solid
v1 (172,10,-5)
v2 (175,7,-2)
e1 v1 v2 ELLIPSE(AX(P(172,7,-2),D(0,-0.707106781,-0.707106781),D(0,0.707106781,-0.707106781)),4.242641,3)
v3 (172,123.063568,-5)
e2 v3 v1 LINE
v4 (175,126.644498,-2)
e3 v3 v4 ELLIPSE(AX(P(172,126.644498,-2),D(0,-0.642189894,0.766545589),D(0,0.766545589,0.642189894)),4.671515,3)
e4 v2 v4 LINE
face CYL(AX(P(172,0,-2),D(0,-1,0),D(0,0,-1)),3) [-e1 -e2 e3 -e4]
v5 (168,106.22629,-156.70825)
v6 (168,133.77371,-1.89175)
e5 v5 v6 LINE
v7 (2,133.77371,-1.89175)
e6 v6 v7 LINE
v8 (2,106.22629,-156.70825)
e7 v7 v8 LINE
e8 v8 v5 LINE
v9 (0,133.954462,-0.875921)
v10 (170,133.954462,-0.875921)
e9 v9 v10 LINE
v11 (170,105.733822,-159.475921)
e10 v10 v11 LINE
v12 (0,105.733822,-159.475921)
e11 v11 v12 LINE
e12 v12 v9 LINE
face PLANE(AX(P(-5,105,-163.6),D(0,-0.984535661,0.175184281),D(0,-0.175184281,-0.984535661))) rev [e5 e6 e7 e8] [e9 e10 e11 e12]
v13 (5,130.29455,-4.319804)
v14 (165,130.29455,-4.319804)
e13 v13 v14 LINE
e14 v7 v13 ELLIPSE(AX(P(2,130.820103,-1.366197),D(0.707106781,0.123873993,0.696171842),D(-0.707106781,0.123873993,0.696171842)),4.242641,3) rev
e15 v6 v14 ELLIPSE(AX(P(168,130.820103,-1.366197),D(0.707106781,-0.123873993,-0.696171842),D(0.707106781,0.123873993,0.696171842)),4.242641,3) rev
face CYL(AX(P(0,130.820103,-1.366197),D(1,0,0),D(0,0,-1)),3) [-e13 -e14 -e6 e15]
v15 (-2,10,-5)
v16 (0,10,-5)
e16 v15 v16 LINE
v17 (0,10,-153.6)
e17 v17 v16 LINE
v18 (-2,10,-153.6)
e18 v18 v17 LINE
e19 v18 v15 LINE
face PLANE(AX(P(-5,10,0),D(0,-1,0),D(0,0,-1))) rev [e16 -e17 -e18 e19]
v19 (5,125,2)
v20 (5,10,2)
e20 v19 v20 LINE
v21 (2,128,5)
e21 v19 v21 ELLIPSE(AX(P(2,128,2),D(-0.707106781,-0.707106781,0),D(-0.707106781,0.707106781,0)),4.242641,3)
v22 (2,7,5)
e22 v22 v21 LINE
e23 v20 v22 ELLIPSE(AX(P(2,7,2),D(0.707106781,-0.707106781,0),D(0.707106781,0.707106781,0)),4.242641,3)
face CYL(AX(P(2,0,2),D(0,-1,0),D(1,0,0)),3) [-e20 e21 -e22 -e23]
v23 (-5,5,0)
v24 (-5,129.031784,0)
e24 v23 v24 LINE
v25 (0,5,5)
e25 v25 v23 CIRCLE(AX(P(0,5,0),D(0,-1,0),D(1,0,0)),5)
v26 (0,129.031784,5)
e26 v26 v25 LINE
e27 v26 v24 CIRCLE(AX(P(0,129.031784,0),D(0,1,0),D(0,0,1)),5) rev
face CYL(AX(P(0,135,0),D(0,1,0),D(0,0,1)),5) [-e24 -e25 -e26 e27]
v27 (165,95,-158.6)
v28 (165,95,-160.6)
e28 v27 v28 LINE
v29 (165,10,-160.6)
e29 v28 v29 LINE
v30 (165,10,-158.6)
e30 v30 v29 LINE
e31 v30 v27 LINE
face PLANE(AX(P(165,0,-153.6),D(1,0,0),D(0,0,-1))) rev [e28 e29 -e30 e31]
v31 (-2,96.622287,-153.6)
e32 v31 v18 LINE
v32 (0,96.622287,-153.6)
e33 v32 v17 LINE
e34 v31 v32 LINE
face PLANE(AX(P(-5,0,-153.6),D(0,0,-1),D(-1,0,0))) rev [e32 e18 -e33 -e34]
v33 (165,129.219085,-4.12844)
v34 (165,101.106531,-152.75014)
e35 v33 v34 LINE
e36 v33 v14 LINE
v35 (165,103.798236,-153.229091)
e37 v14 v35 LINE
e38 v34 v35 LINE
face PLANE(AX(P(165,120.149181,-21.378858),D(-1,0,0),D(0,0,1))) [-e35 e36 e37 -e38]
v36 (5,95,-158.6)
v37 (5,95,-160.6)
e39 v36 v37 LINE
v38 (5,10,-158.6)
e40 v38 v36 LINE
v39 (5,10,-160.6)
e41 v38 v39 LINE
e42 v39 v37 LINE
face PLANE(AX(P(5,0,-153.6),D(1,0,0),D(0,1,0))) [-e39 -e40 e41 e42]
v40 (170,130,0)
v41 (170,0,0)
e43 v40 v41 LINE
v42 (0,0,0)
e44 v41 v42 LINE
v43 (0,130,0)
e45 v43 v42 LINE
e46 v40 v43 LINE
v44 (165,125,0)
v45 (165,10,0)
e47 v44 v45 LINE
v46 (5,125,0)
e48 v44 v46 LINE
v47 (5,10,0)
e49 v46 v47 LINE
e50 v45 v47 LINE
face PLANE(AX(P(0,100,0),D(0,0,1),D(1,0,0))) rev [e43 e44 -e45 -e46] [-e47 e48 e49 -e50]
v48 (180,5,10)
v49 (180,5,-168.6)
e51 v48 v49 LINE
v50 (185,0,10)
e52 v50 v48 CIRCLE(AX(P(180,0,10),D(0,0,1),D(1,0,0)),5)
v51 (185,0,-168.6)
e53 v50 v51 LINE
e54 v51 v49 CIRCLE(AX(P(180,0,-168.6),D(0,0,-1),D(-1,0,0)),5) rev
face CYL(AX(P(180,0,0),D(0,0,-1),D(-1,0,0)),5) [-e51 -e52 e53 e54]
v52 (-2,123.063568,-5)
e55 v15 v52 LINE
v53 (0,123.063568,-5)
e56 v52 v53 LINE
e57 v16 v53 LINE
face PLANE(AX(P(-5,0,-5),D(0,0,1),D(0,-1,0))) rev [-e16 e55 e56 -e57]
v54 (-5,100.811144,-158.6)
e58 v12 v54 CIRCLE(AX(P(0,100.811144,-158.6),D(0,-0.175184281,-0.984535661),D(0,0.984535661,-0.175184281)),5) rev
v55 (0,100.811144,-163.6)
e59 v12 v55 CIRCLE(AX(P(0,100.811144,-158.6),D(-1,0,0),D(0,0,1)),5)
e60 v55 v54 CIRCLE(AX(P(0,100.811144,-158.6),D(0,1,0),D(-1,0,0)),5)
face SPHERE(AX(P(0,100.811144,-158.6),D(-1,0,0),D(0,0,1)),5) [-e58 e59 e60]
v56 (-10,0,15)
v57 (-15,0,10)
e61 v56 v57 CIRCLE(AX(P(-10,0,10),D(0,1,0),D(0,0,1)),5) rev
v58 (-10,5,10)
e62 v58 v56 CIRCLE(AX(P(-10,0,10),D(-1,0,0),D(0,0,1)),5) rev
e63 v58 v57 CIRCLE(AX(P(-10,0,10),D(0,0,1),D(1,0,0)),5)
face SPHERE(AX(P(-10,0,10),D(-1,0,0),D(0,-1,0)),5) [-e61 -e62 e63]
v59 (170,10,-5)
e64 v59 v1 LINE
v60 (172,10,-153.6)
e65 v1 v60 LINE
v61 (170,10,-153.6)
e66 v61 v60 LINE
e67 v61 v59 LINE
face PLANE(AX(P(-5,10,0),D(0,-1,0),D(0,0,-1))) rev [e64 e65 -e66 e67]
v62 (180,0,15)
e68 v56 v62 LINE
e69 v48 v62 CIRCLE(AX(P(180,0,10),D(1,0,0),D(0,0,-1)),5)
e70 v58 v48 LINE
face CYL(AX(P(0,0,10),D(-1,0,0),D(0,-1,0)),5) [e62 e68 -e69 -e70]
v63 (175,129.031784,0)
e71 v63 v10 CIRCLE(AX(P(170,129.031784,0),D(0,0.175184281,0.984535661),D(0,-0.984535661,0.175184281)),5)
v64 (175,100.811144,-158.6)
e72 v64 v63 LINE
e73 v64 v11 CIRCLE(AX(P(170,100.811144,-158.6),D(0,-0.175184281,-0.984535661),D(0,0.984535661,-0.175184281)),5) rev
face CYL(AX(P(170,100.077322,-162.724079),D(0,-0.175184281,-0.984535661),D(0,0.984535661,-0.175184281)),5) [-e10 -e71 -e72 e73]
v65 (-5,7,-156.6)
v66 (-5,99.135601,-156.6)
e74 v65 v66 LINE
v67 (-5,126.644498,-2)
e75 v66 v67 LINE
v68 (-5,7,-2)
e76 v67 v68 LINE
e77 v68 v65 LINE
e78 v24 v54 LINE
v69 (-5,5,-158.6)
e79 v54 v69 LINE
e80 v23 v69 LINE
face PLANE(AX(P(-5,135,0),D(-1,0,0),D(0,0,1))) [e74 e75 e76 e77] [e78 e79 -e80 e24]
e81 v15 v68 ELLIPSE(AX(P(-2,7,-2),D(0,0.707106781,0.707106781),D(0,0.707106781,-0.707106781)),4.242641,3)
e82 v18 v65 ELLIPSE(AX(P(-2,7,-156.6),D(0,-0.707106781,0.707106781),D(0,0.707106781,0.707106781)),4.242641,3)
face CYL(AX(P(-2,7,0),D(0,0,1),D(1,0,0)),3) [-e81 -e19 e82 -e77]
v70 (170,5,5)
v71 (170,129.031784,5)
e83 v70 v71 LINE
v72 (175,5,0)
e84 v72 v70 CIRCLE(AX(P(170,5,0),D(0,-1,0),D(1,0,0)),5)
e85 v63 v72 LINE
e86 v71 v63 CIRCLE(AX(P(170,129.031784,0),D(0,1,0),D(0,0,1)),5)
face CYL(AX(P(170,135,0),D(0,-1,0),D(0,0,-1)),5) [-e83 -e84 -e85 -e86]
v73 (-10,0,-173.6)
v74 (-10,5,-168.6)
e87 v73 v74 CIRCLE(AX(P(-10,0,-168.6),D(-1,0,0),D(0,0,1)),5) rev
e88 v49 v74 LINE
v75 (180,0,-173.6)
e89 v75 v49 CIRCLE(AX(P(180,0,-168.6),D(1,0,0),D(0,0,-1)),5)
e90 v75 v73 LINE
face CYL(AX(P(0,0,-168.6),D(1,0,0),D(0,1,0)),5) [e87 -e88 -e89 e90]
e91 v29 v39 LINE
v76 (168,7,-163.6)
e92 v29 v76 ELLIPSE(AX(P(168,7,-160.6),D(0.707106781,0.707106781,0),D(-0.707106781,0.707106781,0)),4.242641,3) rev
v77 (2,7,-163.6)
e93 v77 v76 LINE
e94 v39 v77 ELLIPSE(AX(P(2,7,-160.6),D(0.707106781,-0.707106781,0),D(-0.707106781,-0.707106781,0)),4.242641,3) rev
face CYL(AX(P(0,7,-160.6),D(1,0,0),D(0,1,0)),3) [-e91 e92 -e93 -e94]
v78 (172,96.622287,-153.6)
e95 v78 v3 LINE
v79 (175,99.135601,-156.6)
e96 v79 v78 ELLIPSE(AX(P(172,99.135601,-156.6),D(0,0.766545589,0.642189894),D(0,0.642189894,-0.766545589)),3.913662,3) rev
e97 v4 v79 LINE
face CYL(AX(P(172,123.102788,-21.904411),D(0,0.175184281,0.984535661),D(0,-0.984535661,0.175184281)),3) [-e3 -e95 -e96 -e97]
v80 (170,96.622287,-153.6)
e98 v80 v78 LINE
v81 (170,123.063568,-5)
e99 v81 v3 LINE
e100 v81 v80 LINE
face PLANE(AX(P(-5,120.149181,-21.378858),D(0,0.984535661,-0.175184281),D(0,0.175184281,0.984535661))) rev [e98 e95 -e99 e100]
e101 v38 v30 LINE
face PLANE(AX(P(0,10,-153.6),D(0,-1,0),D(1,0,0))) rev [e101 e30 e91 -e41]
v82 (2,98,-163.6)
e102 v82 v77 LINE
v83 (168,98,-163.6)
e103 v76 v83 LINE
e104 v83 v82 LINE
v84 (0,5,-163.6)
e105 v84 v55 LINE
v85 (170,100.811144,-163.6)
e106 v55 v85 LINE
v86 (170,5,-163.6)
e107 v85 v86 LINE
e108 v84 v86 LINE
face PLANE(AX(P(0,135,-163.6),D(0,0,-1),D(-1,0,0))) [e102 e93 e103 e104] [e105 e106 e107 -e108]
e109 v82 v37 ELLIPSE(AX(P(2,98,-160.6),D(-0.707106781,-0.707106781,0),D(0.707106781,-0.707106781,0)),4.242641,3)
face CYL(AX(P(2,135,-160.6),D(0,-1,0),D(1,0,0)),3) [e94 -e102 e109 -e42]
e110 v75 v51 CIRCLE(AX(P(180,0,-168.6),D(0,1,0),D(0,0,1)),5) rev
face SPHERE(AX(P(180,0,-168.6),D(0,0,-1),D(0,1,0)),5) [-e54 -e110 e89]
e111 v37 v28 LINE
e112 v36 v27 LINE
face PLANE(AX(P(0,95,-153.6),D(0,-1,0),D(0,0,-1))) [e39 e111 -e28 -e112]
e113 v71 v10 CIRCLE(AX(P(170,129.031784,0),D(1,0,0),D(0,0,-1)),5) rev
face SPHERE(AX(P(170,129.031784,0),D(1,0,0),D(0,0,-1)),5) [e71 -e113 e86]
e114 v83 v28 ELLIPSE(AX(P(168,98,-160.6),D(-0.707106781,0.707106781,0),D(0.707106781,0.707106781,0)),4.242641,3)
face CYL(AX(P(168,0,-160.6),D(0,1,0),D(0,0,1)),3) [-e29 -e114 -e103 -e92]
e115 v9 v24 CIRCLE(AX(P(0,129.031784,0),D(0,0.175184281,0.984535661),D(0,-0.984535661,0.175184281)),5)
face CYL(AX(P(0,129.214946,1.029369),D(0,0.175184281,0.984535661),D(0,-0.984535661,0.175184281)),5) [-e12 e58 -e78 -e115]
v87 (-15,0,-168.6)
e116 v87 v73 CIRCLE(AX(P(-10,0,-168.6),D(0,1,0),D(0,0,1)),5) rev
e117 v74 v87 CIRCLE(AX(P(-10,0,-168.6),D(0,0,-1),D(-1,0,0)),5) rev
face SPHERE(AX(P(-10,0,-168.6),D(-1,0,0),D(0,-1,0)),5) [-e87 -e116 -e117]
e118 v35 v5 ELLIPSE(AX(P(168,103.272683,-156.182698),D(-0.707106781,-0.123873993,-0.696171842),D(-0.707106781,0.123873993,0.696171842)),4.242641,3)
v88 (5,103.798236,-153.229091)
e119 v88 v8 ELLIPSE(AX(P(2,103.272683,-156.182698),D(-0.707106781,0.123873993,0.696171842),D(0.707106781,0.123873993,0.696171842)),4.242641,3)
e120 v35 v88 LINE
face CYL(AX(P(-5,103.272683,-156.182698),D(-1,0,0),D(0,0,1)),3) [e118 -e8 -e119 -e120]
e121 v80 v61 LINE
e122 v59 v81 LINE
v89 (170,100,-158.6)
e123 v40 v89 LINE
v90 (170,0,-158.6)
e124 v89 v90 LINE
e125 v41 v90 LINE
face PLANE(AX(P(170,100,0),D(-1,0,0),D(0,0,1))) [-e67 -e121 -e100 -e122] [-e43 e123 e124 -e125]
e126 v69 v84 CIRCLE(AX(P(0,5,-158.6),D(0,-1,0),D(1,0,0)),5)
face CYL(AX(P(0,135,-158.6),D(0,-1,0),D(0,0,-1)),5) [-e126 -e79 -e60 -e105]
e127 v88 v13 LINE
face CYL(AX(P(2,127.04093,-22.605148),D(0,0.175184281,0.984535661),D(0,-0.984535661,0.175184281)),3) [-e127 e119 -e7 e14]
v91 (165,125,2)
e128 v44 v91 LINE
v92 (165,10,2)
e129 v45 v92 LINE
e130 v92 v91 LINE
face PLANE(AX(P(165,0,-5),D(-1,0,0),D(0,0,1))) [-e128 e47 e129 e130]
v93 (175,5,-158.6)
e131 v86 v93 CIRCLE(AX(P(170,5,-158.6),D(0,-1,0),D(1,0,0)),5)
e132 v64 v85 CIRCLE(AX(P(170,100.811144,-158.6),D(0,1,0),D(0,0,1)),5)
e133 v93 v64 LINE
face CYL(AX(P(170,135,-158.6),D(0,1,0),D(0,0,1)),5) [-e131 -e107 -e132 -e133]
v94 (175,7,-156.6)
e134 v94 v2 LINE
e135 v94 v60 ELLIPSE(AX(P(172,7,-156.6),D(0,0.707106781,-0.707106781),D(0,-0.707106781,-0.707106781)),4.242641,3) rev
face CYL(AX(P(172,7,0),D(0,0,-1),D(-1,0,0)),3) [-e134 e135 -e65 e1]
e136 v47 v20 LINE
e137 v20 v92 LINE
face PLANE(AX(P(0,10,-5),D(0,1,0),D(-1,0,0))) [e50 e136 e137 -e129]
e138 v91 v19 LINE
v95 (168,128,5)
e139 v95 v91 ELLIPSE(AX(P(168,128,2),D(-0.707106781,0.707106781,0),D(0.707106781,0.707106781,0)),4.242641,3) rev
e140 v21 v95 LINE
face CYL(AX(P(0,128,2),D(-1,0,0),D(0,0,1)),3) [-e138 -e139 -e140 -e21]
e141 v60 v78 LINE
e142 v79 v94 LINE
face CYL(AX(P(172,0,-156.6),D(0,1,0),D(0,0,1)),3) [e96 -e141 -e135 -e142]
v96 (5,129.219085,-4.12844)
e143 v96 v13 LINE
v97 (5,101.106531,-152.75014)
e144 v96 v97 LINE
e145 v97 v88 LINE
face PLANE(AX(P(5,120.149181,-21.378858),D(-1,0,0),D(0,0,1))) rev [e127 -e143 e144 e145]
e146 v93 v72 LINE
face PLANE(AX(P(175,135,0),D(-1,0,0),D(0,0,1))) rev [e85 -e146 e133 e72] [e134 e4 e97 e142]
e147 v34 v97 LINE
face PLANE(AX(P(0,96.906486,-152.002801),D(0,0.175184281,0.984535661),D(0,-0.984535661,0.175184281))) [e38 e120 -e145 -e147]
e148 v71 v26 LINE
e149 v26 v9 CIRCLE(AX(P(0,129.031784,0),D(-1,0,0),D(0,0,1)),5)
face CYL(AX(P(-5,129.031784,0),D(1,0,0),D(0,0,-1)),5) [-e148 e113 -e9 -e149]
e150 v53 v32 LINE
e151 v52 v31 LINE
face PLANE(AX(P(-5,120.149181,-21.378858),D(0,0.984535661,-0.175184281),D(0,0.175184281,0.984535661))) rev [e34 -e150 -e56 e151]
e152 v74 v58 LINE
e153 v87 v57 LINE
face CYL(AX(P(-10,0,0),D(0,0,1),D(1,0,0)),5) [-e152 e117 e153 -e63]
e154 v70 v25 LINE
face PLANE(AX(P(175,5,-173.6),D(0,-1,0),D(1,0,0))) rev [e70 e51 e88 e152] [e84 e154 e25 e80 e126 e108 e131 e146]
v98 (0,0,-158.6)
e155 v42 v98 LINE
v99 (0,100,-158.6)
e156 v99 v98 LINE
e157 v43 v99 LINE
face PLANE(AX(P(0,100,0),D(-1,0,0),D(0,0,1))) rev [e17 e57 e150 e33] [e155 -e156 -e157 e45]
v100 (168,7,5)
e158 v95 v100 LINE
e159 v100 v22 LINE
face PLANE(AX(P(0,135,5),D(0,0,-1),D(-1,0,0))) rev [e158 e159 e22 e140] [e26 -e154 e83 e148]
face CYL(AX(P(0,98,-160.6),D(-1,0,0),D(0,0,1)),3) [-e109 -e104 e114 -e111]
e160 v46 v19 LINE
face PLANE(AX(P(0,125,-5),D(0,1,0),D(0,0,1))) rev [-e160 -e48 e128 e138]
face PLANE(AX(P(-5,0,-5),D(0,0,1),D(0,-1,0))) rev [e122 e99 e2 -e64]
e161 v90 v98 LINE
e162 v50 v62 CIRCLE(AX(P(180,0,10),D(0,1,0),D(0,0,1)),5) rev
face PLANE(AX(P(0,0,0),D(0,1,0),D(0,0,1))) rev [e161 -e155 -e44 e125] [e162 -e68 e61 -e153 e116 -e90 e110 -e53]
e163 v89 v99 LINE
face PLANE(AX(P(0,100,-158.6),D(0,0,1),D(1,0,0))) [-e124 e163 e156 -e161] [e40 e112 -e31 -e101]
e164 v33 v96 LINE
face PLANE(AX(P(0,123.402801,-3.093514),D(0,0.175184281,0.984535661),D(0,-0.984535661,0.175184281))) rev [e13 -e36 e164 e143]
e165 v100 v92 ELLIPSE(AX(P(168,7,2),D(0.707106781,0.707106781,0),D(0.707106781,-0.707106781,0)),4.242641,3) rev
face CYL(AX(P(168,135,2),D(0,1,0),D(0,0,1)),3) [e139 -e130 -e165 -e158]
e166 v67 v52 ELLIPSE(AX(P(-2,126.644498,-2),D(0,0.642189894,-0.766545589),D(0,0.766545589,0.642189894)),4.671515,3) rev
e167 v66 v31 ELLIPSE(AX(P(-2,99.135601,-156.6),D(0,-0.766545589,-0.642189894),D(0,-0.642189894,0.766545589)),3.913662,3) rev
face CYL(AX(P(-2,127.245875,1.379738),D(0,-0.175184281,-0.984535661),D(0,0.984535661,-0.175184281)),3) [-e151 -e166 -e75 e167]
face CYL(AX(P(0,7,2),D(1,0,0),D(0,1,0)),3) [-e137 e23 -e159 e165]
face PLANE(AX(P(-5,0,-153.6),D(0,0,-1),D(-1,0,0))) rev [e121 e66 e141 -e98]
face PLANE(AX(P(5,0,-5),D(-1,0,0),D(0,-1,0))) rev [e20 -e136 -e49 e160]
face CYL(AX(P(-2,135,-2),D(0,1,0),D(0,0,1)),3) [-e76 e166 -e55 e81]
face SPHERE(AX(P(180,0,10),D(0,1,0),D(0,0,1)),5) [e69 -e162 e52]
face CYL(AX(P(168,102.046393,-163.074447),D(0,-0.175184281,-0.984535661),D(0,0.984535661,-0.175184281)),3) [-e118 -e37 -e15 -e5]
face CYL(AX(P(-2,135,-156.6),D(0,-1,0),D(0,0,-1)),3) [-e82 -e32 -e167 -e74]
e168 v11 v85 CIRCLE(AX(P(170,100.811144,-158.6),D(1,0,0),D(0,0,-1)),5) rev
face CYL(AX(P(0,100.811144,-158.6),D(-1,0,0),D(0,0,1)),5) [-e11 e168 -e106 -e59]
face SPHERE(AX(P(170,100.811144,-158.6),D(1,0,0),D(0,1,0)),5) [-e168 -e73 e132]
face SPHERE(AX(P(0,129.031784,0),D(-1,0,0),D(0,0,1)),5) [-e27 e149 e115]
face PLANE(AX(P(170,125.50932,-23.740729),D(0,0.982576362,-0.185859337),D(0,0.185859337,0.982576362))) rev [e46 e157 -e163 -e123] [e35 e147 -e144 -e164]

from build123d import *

# Parameters (mm, degrees)
SKETCH1_W           = 180
SKETCH1_H           = 168.6
SKETCH1_W_2         = 170
SKETCH1_H_2         = 158.6
BOSS_EXTRUDE1_DEPTH = 135
SKETCH1_3_W         = 170
SKETCH1_3_H         = 158.6
SKETCH1_3_W_2       = 160
SKETCH1_3_H_2       = 148.6
BOSS_EXTRUDE2_DEPTH = 135
CUT_EXTRUDE1_DEPTH  = 180
SKETCH3_W           = 160
SKETCH3_H           = 151.248240867
CUT_EXTRUDE2_DEPTH  = 10
SKETCH4_W           = 170
SKETCH4_H           = 158.6
CUT_EXTRUDE3_DEPTH  = 100
CUT_EXTRUDE5_DEPTH  = 170
CUT_EXTRUDE6_DEPTH  = 180
SKETCH7_W           = 160
SKETCH7_H           = 115
CUT_EXTRUDE7_DEPTH  = 10
SKETCH8_W           = 160
SKETCH8_H           = 85
CUT_EXTRUDE8_DEPTH  = 10
FILLET2_R           = 3
FILLET3_R           = 3
SKETCH9_W           = 180
SKETCH9_H           = 5
BOSS_EXTRUDE3_DEPTH = 10
SKETCH10_W          = 180
SKETCH10_H          = 5
BOSS_EXTRUDE4_DEPTH = 10
SKETCH11_W          = 188.6
SKETCH11_H          = 5
BOSS_EXTRUDE5_DEPTH = 10
SKETCH12_W          = 188.6
SKETCH12_H          = 5
BOSS_EXTRUDE6_DEPTH = 10
FILLET4_R           = 5
FILLET5_R           = 5


with BuildPart() as part:
    # Sketch1 → Boss-Extrude1 (new body)
    with BuildSketch(Plane(origin=(0, 0, 0), x_dir=(1, 0, 0), z_dir=(0, 1, 0))):
        with Locations((85, 79.3)):
            Rectangle(SKETCH1_W, SKETCH1_H)
        with Locations((85, 79.3)):
            Rectangle(SKETCH1_W_2, SKETCH1_H_2, mode=Mode.SUBTRACT)
    extrude(amount=BOSS_EXTRUDE1_DEPTH)

    # Sketch1<3> → Boss-Extrude2 (add)
    # profile 1 of 2: a face of its own
    with BuildSketch(Plane(origin=(0, 0, 0), x_dir=(1, 0, 0), z_dir=(0, 1, 0))):
        with Locations((85, 79.3)):
            Rectangle(SKETCH1_3_W, SKETCH1_3_H)
        with Locations((85, 79.3)):
            Rectangle(SKETCH1_3_W_2, SKETCH1_3_H_2, mode=Mode.SUBTRACT)
    # profile 2 of 2: a face of its own
    with BuildSketch(Plane(origin=(0, 0, 0), x_dir=(1, 0, 0), z_dir=(0, 1, 0))):
        with Locations((85, 79.3)):
            Rectangle(SKETCH1_3_W_2, SKETCH1_3_H_2)
    extrude(amount=BOSS_EXTRUDE2_DEPTH)

    # Sketch2 → Cut-Extrude1 (cut)
    with BuildSketch(Plane(origin=(175, 0, 0), x_dir=(0, 0, -1), z_dir=(1, 0, 0))):
        Polygon((-5, 135), (163.6, 135), (163.6, 105), align=None)
    extrude(amount=-CUT_EXTRUDE1_DEPTH, mode=Mode.SUBTRACT)

    # Sketch3 → Cut-Extrude2 (cut)
    with BuildSketch(Plane(origin=(0, 129.994537263, -23.130700581), x_dir=(1, 0, 0), z_dir=(0, 0.9845356609009732, -0.17518428129910554))):
        with Locations((85, 57.051564154)):
            Rectangle(SKETCH3_W, SKETCH3_H)
    extrude(amount=-CUT_EXTRUDE2_DEPTH, mode=Mode.SUBTRACT)

    # Sketch4 → Cut-Extrude3 (cut)
    with BuildSketch(Plane.XZ):
        with Locations((85, -79.3)):
            Rectangle(SKETCH4_W, SKETCH4_H)
    extrude(amount=-CUT_EXTRUDE3_DEPTH, mode=Mode.SUBTRACT)

    # Sketch5 → Cut-Extrude5 (cut)
    with BuildSketch(Plane(origin=(0, 0, 0), x_dir=(0, 0, -1), z_dir=(1, 0, 0))):
        Polygon((0, 130), (158.6, 100), (0, 100), align=None)
    extrude(amount=CUT_EXTRUDE5_DEPTH, mode=Mode.SUBTRACT)

    # Sketch6 → Cut-Extrude6 (cut)
    with BuildSketch(Plane(origin=(175, 0, 0), x_dir=(0, 0, -1), z_dir=(1, 0, 0))):
        Polygon((5, 10), (153.6, 10), (153.6, 96.622287019), (5, 123.063568157), align=None)
    extrude(amount=-CUT_EXTRUDE6_DEPTH, mode=Mode.SUBTRACT)

    # Sketch7 → Cut-Extrude7 (cut)
    with BuildSketch(Plane.XY.offset(5)):
        with Locations((85, 67.5)):
            Rectangle(SKETCH7_W, SKETCH7_H)
    extrude(amount=-CUT_EXTRUDE7_DEPTH, mode=Mode.SUBTRACT)

    # Sketch8 → Cut-Extrude8 (cut)
    with BuildSketch(Plane(origin=(0, 0, -163.6), x_dir=(-1, 0, 0), z_dir=(0, 0, -1))):
        with Locations((-85, 52.5)):
            Rectangle(SKETCH8_W, SKETCH8_H)
    extrude(amount=-CUT_EXTRUDE8_DEPTH, mode=Mode.SUBTRACT)

    # Fillet2
    fillet2_edges = [part.edges().sort_by_distance(p)[0] for p in [
        (85, 106.751842813, -153.754643391),
        (165, 120, -79.3),
        (5, 120, -79.3),
        (85, 133.248157187, -4.845356609),
    ]]
    fillet(fillet2_edges, radius=FILLET2_R)

    # Fillet3
    fillet3_edges = [part.edges().sort_by_distance(p)[0] for p in [
        (-5, 10, -79.3),
        (-5, 66.531784079, -5),
        (-5, 109.842927588, -79.3),
        (-5, 53.311143509, -153.6),
        (175, 10, -79.3),
        (175, 53.311143509, -153.6),
        (175, 109.842927588, -79.3),
        (175, 66.531784079, -5),
        (165, 67.5, 5),
        (85, 10, 5),
        (85, 125, 5),
        (5, 67.5, 5),
        (85, 95, -163.6),
        (5, 52.5, -163.6),
        (165, 52.5, -163.6),
        (85, 10, -163.6),
    ]]
    fillet(fillet3_edges, radius=FILLET3_R)

    # Sketch9 → Boss-Extrude3 (add)
    with BuildSketch(Plane(origin=(0, 0, -163.6), x_dir=(-1, 0, 0), z_dir=(0, 0, -1))):
        with Locations((-85, 2.5)):
            Rectangle(SKETCH9_W, SKETCH9_H)
    extrude(amount=BOSS_EXTRUDE3_DEPTH)

    # Sketch10 → Boss-Extrude4 (add)
    with BuildSketch(Plane.XY.offset(5)):
        with Locations((85, 2.5)):
            Rectangle(SKETCH10_W, SKETCH10_H)
    extrude(amount=BOSS_EXTRUDE4_DEPTH)

    # Sketch11 → Boss-Extrude5 (add)
    with BuildSketch(Plane.ZY.offset(5)):
        with Locations((-79.3, 2.5)):
            Rectangle(SKETCH11_W, SKETCH11_H)
    extrude(amount=BOSS_EXTRUDE5_DEPTH)

    # Sketch12 → Boss-Extrude6 (add)
    with BuildSketch(Plane(origin=(175, 0, 0), x_dir=(0, 0, -1), z_dir=(1, 0, 0))):
        with Locations((79.3, 2.5)):
            Rectangle(SKETCH12_W, SKETCH12_H)
    extrude(amount=BOSS_EXTRUDE6_DEPTH)

    # Fillet4
    fillet4_edges = [part.edges().sort_by_distance(p)[0] for p in [
        (85, 135, 5),
        (175, 70, 5),
        (-5, 70, 5),
        (-5, 55, -163.6),
        (175, 55, -163.6),
        (-5, 120, -79.3),
        (85, 105, -163.6),
        (175, 120, -79.3),
    ]]
    fillet(fillet4_edges, radius=FILLET4_R)

    # Fillet5
    fillet5_edges = [part.edges().sort_by_distance(p)[0] for p in [
        (85, 5, -173.6),
        (85, 5, 15),
        (-15, 2.5, -173.6),
        (-15, 2.5, 15),
        (-15, 5, -79.3),
        (185, 2.5, 15),
        (185, 2.5, -173.6),
        (185, 5, -79.3),
    ]]
    fillet(fillet5_edges, radius=FILLET5_R - 0.0001)  # a hair under: the kernel refuses the full size


solid = part.part
